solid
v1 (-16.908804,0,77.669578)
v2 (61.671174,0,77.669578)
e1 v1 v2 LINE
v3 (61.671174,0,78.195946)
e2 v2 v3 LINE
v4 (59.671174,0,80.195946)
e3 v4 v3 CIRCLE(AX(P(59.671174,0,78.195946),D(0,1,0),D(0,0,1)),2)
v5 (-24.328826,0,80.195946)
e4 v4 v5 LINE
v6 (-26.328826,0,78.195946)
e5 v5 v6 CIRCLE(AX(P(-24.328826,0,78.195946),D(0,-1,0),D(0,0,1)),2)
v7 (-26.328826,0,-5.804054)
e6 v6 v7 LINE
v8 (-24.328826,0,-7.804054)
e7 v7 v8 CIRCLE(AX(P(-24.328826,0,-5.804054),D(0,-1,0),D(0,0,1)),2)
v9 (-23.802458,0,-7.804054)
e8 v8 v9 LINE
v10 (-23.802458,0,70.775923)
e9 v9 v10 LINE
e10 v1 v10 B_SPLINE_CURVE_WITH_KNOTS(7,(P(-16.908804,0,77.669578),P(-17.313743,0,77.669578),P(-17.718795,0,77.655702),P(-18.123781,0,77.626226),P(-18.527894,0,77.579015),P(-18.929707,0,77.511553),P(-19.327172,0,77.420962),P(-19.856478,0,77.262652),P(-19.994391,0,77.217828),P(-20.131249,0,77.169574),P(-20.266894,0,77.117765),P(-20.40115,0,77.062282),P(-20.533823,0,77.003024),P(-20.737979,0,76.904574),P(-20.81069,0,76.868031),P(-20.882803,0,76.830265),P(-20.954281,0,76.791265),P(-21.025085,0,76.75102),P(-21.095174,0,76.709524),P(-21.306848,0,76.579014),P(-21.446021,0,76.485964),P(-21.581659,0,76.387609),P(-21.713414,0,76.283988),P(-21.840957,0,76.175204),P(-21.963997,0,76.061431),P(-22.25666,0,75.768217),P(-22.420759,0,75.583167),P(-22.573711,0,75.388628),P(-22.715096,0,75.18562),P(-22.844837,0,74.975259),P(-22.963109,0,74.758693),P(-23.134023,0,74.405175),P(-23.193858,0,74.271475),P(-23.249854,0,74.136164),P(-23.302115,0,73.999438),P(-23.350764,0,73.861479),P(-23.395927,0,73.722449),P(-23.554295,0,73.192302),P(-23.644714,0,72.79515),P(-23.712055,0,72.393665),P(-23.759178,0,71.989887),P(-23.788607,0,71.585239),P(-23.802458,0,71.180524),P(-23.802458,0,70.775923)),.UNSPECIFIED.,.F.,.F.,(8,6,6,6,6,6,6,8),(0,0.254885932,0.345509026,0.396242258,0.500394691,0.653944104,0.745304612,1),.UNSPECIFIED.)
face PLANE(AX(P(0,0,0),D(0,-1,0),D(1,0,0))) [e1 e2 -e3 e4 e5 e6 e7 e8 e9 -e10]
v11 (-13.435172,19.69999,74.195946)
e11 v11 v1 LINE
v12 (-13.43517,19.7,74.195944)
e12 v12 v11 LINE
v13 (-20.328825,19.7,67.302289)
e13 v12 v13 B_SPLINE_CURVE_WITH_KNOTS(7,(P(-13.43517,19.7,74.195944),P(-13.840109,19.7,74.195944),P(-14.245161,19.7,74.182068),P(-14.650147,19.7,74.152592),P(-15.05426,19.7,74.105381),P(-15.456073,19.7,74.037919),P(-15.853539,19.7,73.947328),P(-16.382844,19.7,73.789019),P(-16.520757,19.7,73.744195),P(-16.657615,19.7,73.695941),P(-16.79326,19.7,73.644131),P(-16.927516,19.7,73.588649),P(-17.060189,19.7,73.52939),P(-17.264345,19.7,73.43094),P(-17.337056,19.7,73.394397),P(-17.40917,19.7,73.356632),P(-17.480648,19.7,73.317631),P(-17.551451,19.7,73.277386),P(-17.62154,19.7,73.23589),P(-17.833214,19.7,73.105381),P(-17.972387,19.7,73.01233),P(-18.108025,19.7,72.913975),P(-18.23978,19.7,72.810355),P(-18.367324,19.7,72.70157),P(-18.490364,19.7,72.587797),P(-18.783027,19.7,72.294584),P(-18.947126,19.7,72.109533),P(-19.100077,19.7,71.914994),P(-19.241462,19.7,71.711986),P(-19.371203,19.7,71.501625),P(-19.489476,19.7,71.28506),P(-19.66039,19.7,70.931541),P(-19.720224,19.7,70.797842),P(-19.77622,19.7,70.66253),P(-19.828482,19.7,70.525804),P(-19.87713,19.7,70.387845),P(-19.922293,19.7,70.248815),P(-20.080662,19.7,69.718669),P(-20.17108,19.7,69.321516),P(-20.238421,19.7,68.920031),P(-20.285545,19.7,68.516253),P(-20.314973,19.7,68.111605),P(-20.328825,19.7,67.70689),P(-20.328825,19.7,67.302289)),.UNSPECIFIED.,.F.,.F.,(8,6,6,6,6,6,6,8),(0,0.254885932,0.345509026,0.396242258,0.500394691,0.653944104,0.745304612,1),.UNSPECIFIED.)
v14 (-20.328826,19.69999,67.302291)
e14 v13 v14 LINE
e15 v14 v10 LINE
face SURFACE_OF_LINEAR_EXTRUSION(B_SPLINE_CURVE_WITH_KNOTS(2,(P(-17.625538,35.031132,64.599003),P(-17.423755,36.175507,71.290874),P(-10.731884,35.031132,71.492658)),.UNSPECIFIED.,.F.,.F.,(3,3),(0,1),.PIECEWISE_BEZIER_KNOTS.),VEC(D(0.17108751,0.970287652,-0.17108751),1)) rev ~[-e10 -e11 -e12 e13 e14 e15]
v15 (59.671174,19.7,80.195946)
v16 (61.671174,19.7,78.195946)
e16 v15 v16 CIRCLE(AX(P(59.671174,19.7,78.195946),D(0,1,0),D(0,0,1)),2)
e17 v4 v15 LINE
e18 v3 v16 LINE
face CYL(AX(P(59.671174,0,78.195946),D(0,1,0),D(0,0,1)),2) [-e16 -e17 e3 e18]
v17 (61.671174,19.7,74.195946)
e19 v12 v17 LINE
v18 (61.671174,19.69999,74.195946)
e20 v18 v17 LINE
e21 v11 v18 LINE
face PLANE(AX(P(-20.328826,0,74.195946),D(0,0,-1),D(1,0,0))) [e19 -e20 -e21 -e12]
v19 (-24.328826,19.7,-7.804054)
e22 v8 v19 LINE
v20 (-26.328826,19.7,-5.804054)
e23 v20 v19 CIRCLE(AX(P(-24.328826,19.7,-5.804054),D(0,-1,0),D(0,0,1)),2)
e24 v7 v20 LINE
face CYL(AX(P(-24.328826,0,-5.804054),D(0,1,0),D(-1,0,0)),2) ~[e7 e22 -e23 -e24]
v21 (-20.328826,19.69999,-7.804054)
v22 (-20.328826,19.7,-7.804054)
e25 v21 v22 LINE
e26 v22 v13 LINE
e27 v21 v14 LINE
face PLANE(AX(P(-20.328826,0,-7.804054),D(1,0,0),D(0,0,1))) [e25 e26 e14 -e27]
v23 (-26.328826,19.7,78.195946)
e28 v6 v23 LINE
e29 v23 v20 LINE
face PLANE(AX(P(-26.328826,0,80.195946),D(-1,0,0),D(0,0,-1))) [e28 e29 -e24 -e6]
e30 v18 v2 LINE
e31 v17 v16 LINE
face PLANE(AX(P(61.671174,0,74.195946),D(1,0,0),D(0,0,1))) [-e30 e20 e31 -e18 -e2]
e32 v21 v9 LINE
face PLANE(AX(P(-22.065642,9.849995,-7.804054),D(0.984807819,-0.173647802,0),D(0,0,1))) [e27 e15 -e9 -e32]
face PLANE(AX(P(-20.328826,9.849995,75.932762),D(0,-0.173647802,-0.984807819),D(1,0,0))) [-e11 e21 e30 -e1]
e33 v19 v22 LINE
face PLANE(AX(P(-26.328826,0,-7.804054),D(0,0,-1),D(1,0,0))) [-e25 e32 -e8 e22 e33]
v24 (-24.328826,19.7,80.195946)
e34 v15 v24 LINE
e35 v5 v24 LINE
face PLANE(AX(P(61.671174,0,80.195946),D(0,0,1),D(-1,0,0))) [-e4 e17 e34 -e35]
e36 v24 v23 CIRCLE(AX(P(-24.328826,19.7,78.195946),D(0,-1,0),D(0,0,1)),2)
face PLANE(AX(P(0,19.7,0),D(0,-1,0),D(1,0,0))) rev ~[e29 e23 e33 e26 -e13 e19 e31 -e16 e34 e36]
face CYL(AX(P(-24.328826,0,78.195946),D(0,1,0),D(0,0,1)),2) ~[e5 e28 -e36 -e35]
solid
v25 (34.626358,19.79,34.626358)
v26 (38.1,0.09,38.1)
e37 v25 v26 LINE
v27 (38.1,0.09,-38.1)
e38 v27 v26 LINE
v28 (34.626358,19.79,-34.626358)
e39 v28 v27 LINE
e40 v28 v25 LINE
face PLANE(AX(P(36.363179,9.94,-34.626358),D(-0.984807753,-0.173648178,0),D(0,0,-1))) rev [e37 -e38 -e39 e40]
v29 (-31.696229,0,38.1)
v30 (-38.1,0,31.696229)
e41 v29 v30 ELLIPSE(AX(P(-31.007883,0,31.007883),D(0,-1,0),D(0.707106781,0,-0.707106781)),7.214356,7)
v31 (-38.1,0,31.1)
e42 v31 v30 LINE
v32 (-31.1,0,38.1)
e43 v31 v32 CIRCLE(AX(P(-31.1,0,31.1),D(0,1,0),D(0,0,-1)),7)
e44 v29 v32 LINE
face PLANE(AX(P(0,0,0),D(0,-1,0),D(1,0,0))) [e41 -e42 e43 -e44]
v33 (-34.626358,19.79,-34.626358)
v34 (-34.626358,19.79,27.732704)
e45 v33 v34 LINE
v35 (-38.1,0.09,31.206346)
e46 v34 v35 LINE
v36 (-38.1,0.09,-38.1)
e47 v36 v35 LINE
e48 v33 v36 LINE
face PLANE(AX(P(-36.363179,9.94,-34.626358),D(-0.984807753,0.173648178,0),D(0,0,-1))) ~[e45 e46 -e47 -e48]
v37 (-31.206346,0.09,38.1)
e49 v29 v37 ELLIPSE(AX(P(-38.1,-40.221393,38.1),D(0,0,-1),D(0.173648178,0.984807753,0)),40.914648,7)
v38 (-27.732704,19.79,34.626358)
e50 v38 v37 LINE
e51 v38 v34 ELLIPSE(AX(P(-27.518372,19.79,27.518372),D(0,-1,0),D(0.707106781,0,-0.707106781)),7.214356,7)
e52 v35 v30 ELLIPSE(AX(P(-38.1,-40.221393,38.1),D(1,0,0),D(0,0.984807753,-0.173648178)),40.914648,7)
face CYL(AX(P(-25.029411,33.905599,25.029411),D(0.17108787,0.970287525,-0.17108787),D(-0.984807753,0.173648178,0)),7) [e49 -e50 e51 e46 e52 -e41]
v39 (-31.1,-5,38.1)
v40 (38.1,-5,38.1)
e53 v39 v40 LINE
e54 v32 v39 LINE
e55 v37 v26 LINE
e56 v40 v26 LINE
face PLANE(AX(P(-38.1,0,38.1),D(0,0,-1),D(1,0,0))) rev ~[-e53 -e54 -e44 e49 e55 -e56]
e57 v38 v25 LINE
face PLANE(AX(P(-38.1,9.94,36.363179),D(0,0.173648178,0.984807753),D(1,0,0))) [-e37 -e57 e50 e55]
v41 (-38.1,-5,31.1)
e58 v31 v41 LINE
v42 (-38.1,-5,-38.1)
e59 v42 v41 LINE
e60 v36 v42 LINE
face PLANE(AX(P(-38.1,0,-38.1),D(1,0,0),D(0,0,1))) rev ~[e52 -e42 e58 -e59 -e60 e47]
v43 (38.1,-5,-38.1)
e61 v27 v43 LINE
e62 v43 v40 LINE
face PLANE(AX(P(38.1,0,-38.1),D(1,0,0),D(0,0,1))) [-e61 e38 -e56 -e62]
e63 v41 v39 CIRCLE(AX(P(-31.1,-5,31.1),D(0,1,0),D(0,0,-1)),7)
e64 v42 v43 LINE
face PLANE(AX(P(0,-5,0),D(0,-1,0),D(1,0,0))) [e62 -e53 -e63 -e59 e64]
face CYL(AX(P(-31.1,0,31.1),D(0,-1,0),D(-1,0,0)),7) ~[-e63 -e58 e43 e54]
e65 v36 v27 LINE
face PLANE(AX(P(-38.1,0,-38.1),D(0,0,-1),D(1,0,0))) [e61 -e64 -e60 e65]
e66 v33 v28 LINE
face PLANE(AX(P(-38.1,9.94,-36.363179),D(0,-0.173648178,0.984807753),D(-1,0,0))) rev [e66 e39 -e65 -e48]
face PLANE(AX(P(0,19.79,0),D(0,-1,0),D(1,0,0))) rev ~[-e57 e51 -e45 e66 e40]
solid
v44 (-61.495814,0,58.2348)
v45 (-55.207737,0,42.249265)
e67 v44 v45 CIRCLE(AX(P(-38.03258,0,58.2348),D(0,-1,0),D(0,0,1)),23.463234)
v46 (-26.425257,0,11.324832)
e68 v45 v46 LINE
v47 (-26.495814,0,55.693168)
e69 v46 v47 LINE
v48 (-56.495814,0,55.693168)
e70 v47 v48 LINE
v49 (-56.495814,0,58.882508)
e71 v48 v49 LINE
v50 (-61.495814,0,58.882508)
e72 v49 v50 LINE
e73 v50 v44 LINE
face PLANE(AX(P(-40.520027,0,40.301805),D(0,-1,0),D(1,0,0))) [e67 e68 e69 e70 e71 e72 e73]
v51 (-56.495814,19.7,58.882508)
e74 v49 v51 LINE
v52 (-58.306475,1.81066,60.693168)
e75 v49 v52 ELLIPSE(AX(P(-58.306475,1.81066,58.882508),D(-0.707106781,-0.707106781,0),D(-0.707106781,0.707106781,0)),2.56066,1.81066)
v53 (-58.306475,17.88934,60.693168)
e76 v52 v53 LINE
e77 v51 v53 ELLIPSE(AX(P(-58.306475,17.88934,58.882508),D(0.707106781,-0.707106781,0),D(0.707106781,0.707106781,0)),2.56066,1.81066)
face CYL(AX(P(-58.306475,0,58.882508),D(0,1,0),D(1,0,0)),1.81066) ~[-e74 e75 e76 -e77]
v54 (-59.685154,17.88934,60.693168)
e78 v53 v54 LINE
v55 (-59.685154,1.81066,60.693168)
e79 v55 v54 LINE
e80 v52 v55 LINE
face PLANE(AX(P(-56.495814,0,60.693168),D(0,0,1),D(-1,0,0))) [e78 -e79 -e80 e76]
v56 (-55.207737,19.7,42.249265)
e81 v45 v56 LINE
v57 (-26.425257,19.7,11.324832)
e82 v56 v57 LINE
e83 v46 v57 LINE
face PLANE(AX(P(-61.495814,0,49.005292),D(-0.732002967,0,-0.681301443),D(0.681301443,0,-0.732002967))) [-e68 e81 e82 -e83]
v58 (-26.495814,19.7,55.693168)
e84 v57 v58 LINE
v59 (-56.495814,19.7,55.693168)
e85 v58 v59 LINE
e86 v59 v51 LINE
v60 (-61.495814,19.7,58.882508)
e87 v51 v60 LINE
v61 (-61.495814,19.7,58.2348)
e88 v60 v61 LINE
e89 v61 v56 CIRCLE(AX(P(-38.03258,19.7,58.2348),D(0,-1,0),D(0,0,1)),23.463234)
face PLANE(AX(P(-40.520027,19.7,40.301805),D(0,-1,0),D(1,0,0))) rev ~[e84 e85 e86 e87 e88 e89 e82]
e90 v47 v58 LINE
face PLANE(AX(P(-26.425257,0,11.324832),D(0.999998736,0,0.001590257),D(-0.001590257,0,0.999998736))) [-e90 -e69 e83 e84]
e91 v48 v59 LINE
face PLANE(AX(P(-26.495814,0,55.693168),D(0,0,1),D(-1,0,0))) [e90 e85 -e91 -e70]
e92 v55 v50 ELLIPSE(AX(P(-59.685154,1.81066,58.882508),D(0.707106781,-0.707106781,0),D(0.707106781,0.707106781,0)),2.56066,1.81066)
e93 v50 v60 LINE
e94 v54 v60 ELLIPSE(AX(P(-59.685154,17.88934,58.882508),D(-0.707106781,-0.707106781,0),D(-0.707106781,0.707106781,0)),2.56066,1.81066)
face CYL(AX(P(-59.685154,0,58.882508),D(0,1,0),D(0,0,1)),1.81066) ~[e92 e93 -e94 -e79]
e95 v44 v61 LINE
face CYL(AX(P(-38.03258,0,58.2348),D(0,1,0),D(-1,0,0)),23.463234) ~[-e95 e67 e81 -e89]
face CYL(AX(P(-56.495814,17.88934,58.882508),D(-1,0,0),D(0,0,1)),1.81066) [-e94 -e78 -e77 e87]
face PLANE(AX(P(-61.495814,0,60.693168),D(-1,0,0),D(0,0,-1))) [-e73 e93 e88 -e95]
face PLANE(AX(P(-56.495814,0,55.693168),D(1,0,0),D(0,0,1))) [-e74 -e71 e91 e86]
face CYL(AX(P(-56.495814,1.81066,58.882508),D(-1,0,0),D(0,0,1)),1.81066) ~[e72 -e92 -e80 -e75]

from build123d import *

# Parameters (mm, degrees)
F0_W        = 76.2
F0_H        = 76.2
F1_DEPTH    = 5
F2_R        = 7
F3_DEPTH    = 19.79
F4_C1_SIZE2 = 3.47364152
F4_C1_SIZE  = 19.7
F4_C2_SIZE2 = 19.7
F4_C2_SIZE  = 3.47364152
F4_C3_SIZE2 = 19.7
F4_C3_SIZE  = 3.47364152
F4_C4_SIZE2 = 19.7
F4_C4_SIZE  = 3.47364152
F5_T1_DEPTH = 88.2233868706
F7_DEPTH    = 19.7
F8_SIZE2    = 3.473632
F8_SIZE     = 19.69999
F9_T4_DEPTH = 54.2633149659
F11_DEPTH   = 19.7
F12_R       = 1.8106601718
F13_R       = 23.4632344254
F14_R       = 2
F15_R       = 2
F16_R       = 2


# Not quite as in the source:
# - a fillet or chamfer that OpenCascade refuses, or shapes differently, is made with other operations: its cross-section is extruded or revolved along the edge and cut away or added
# - a fillet or chamfer is up to 0.001 mm smaller than in the source, because OpenCascade refuses the exact size


with BuildPart() as f1:
    # F0 (on Front) → F1 (new body)
    with BuildSketch(Plane.XZ):
        Rectangle(F0_W, F0_H)
    extrude(amount=F1_DEPTH)

    # F2
    f2_edges = [f1.edges().sort_by_distance(p)[0] for p in [
        (-38.1, -2.5, 38.1),
    ]]
    fillet(f2_edges, radius=F2_R)

    # F0 (on Front) → F3 (join)
    with BuildSketch(Plane.XZ):
        Rectangle(F0_W, F0_H)
    extrude(amount=-F3_DEPTH)

    # F4: chamfer of 19.7 x 3.47364152 on 4 edges, made by hand

    # F4_c1
    f4_c1_edges = [f1.edges().sort_by_distance(p)[0] for p in [
        (0, 19.79, 38.1),
    ]]
    f4_c1_side = f1.faces().sort_by_distance((0, 19.7205271696, 38.1))[0]
    chamfer(f4_c1_edges, length=F4_C1_SIZE, length2=F4_C1_SIZE2, reference=f4_c1_side)

    # F4_c2
    f4_c2_edges = [f1.edges().sort_by_distance(p)[0] for p in [
        (0, 19.79, -38.1),
    ]]
    f4_c2_side = f1.faces().sort_by_distance((0, 19.79, -38.0305271696))[0]
    chamfer(f4_c2_edges, length=F4_C2_SIZE, length2=F4_C2_SIZE2, reference=f4_c2_side)

    # F4_c3
    f4_c3_edges = [f1.edges().sort_by_distance(p)[0] for p in [
        (38.1, 19.79, 0),
    ]]
    f4_c3_side = f1.faces().sort_by_distance((38.0305271696, 19.79, 0))[0]
    chamfer(f4_c3_edges, length=F4_C3_SIZE, length2=F4_C3_SIZE2, reference=f4_c3_side)

    # F4_c4
    f4_c4_edges = [f1.edges().sort_by_distance(p)[0] for p in [
        (-38.1, 19.79, 0),
    ]]
    f4_c4_side = f1.faces().sort_by_distance((-38.0305271696, 19.79, 0))[0]
    chamfer(f4_c4_edges, length=F4_C4_SIZE, length2=F4_C4_SIZE2, reference=f4_c4_side)

    # F5: fillet of radius 7 on 1 edges, made by hand

    # F5_s2 → F5_t1 (cut)
    with BuildSketch(Plane(origin=(4.1632046596, 23.6107068972, -4.1632046596), x_dir=(0.984807753, -0.1736481777, 0), z_dir=(-0.1710878697, -0.9702875252, 0.1710878697))):
        with BuildLine():
            ThreePointArc((-37.5368037258, 29.629479716), (-35.560623527, 34.5040293983), (-30.747879553, 36.6262966348))
            Line((-30.747879553, 36.6262966348), (-37.5368037258, 36.4214923928))
            Line((-37.5368037258, 36.4214923928), (-37.5368037258, 29.629479716))
        make_face()
    extrude(amount=F5_T1_DEPTH, mode=Mode.SUBTRACT)


with BuildPart() as f7:
    # F6 (on Front) → F7 (new body)
    with BuildSketch(Plane.XZ):
        Polygon((-26.3288263232, 80.1959456988), (-26.3288263232, -7.8040543012), (-20.3288263232, -7.8040543012), (-20.3288263232, 74.1959456988), (61.6711736768, 74.1959456988), (61.6711736768, 80.1959456988), align=None)
    extrude(amount=-F7_DEPTH)

    # F8 (size 19.7 and 3.47364152 in the source; OpenCascade refuses exactly that, so slightly less here)
    f8_edges = [f7.edges().sort_by_distance(p)[0] for p in [
        (-20.328826, 0, 33.195946),
        (20.671174, 0, 74.195946),
    ]]
    chamfer(f8_edges, length=F8_SIZE, length2=F8_SIZE2)

    # F9: fillet of radius 7 on 1 edges, made by hand


with BuildPart() as f9_tool2:
    # F9_s3 → F9_t4 (new body)
    with BuildSketch(Plane(origin=(3.4085222403, 19.330733379, -3.4085222403), x_dir=(0.9848078193, -0.1736478016, 0), z_dir=(-0.1710875101, -0.9702876521, 0.1710875101))):
        with BuildLine():
            add(Edge.make_bspline(
                [(-23.4408470757, 69.0252446825), (-23.4408470757, 75.8172582472), (-16.6519219887, 76.0220616289)],
                knots=[0, 0, 0, 1, 1, 1], degree=2, weights=[1, 1, 1]))
            Line((-16.6519219887, 76.0220616289), (-16.656143487, 76.1619979678))
            Line((-16.656143487, 76.1619979678), (-23.5808470757, 75.9530985184))
            Line((-23.5808470757, 75.9530985184), (-23.5808470757, 69.0252446825))
            Line((-23.5808470757, 69.0252446825), (-23.4408470757, 69.0252446825))
        make_face()
    extrude(amount=F9_T4_DEPTH)

    split(bisect_by=Plane.XZ.offset(-19.7), keep=Keep.TOP)

    split(bisect_by=Plane.XZ, keep=Keep.BOTTOM)


with BuildPart() as f7_1:
    add(f7.part)

    # F9_t1: union F9_tool2
    add(f9_tool2.part)

    # F14
    f14_edges = [f7_1.edges().sort_by_distance(p)[0] for p in [
        (-26.328826, 9.85, 80.195946),
    ]]
    fillet(f14_edges, radius=F14_R)

    # F15
    f15_edges = [f7_1.edges().sort_by_distance(p)[0] for p in [
        (-26.328826, 9.85, -7.804054),
    ]]
    fillet(f15_edges, radius=F15_R)

    # F16
    f16_edges = [f7_1.edges().sort_by_distance(p)[0] for p in [
        (61.671174, 9.85, 80.195946),
    ]]
    fillet(f16_edges, radius=F16_R)


with BuildPart() as f11:
    # F10 (on Front) → F11 (new body)
    with BuildSketch(Plane.XZ):
        Polygon((-26.4252573252, 11.3248322159), (-26.4958144724, 55.6931681931), (-56.4958144724, 55.6931681931), (-56.4958144724, 60.6931681931), (-61.4958144724, 60.6931681931), (-61.4958144724, 49.005292356), align=None)
    extrude(amount=-F11_DEPTH)

    # F12
    f12_edges = [f11.edges().sort_by_distance(p)[0] for p in [
        (-56.495814, 9.85, 60.693168),
        (-61.495814, 9.85, 60.693168),
        (-58.995814, 0, 60.693168),
        (-58.995814, 19.7, 60.693168),
    ]]
    fillet(f12_edges, radius=F12_R)

    # F13
    f13_edges = [f11.edges().sort_by_distance(p)[0] for p in [
        (-61.495814, 9.85, 49.005292),
    ]]
    fillet(f13_edges, radius=F13_R)


solid = Compound([f1.part, f7_1.part, f11.part])
